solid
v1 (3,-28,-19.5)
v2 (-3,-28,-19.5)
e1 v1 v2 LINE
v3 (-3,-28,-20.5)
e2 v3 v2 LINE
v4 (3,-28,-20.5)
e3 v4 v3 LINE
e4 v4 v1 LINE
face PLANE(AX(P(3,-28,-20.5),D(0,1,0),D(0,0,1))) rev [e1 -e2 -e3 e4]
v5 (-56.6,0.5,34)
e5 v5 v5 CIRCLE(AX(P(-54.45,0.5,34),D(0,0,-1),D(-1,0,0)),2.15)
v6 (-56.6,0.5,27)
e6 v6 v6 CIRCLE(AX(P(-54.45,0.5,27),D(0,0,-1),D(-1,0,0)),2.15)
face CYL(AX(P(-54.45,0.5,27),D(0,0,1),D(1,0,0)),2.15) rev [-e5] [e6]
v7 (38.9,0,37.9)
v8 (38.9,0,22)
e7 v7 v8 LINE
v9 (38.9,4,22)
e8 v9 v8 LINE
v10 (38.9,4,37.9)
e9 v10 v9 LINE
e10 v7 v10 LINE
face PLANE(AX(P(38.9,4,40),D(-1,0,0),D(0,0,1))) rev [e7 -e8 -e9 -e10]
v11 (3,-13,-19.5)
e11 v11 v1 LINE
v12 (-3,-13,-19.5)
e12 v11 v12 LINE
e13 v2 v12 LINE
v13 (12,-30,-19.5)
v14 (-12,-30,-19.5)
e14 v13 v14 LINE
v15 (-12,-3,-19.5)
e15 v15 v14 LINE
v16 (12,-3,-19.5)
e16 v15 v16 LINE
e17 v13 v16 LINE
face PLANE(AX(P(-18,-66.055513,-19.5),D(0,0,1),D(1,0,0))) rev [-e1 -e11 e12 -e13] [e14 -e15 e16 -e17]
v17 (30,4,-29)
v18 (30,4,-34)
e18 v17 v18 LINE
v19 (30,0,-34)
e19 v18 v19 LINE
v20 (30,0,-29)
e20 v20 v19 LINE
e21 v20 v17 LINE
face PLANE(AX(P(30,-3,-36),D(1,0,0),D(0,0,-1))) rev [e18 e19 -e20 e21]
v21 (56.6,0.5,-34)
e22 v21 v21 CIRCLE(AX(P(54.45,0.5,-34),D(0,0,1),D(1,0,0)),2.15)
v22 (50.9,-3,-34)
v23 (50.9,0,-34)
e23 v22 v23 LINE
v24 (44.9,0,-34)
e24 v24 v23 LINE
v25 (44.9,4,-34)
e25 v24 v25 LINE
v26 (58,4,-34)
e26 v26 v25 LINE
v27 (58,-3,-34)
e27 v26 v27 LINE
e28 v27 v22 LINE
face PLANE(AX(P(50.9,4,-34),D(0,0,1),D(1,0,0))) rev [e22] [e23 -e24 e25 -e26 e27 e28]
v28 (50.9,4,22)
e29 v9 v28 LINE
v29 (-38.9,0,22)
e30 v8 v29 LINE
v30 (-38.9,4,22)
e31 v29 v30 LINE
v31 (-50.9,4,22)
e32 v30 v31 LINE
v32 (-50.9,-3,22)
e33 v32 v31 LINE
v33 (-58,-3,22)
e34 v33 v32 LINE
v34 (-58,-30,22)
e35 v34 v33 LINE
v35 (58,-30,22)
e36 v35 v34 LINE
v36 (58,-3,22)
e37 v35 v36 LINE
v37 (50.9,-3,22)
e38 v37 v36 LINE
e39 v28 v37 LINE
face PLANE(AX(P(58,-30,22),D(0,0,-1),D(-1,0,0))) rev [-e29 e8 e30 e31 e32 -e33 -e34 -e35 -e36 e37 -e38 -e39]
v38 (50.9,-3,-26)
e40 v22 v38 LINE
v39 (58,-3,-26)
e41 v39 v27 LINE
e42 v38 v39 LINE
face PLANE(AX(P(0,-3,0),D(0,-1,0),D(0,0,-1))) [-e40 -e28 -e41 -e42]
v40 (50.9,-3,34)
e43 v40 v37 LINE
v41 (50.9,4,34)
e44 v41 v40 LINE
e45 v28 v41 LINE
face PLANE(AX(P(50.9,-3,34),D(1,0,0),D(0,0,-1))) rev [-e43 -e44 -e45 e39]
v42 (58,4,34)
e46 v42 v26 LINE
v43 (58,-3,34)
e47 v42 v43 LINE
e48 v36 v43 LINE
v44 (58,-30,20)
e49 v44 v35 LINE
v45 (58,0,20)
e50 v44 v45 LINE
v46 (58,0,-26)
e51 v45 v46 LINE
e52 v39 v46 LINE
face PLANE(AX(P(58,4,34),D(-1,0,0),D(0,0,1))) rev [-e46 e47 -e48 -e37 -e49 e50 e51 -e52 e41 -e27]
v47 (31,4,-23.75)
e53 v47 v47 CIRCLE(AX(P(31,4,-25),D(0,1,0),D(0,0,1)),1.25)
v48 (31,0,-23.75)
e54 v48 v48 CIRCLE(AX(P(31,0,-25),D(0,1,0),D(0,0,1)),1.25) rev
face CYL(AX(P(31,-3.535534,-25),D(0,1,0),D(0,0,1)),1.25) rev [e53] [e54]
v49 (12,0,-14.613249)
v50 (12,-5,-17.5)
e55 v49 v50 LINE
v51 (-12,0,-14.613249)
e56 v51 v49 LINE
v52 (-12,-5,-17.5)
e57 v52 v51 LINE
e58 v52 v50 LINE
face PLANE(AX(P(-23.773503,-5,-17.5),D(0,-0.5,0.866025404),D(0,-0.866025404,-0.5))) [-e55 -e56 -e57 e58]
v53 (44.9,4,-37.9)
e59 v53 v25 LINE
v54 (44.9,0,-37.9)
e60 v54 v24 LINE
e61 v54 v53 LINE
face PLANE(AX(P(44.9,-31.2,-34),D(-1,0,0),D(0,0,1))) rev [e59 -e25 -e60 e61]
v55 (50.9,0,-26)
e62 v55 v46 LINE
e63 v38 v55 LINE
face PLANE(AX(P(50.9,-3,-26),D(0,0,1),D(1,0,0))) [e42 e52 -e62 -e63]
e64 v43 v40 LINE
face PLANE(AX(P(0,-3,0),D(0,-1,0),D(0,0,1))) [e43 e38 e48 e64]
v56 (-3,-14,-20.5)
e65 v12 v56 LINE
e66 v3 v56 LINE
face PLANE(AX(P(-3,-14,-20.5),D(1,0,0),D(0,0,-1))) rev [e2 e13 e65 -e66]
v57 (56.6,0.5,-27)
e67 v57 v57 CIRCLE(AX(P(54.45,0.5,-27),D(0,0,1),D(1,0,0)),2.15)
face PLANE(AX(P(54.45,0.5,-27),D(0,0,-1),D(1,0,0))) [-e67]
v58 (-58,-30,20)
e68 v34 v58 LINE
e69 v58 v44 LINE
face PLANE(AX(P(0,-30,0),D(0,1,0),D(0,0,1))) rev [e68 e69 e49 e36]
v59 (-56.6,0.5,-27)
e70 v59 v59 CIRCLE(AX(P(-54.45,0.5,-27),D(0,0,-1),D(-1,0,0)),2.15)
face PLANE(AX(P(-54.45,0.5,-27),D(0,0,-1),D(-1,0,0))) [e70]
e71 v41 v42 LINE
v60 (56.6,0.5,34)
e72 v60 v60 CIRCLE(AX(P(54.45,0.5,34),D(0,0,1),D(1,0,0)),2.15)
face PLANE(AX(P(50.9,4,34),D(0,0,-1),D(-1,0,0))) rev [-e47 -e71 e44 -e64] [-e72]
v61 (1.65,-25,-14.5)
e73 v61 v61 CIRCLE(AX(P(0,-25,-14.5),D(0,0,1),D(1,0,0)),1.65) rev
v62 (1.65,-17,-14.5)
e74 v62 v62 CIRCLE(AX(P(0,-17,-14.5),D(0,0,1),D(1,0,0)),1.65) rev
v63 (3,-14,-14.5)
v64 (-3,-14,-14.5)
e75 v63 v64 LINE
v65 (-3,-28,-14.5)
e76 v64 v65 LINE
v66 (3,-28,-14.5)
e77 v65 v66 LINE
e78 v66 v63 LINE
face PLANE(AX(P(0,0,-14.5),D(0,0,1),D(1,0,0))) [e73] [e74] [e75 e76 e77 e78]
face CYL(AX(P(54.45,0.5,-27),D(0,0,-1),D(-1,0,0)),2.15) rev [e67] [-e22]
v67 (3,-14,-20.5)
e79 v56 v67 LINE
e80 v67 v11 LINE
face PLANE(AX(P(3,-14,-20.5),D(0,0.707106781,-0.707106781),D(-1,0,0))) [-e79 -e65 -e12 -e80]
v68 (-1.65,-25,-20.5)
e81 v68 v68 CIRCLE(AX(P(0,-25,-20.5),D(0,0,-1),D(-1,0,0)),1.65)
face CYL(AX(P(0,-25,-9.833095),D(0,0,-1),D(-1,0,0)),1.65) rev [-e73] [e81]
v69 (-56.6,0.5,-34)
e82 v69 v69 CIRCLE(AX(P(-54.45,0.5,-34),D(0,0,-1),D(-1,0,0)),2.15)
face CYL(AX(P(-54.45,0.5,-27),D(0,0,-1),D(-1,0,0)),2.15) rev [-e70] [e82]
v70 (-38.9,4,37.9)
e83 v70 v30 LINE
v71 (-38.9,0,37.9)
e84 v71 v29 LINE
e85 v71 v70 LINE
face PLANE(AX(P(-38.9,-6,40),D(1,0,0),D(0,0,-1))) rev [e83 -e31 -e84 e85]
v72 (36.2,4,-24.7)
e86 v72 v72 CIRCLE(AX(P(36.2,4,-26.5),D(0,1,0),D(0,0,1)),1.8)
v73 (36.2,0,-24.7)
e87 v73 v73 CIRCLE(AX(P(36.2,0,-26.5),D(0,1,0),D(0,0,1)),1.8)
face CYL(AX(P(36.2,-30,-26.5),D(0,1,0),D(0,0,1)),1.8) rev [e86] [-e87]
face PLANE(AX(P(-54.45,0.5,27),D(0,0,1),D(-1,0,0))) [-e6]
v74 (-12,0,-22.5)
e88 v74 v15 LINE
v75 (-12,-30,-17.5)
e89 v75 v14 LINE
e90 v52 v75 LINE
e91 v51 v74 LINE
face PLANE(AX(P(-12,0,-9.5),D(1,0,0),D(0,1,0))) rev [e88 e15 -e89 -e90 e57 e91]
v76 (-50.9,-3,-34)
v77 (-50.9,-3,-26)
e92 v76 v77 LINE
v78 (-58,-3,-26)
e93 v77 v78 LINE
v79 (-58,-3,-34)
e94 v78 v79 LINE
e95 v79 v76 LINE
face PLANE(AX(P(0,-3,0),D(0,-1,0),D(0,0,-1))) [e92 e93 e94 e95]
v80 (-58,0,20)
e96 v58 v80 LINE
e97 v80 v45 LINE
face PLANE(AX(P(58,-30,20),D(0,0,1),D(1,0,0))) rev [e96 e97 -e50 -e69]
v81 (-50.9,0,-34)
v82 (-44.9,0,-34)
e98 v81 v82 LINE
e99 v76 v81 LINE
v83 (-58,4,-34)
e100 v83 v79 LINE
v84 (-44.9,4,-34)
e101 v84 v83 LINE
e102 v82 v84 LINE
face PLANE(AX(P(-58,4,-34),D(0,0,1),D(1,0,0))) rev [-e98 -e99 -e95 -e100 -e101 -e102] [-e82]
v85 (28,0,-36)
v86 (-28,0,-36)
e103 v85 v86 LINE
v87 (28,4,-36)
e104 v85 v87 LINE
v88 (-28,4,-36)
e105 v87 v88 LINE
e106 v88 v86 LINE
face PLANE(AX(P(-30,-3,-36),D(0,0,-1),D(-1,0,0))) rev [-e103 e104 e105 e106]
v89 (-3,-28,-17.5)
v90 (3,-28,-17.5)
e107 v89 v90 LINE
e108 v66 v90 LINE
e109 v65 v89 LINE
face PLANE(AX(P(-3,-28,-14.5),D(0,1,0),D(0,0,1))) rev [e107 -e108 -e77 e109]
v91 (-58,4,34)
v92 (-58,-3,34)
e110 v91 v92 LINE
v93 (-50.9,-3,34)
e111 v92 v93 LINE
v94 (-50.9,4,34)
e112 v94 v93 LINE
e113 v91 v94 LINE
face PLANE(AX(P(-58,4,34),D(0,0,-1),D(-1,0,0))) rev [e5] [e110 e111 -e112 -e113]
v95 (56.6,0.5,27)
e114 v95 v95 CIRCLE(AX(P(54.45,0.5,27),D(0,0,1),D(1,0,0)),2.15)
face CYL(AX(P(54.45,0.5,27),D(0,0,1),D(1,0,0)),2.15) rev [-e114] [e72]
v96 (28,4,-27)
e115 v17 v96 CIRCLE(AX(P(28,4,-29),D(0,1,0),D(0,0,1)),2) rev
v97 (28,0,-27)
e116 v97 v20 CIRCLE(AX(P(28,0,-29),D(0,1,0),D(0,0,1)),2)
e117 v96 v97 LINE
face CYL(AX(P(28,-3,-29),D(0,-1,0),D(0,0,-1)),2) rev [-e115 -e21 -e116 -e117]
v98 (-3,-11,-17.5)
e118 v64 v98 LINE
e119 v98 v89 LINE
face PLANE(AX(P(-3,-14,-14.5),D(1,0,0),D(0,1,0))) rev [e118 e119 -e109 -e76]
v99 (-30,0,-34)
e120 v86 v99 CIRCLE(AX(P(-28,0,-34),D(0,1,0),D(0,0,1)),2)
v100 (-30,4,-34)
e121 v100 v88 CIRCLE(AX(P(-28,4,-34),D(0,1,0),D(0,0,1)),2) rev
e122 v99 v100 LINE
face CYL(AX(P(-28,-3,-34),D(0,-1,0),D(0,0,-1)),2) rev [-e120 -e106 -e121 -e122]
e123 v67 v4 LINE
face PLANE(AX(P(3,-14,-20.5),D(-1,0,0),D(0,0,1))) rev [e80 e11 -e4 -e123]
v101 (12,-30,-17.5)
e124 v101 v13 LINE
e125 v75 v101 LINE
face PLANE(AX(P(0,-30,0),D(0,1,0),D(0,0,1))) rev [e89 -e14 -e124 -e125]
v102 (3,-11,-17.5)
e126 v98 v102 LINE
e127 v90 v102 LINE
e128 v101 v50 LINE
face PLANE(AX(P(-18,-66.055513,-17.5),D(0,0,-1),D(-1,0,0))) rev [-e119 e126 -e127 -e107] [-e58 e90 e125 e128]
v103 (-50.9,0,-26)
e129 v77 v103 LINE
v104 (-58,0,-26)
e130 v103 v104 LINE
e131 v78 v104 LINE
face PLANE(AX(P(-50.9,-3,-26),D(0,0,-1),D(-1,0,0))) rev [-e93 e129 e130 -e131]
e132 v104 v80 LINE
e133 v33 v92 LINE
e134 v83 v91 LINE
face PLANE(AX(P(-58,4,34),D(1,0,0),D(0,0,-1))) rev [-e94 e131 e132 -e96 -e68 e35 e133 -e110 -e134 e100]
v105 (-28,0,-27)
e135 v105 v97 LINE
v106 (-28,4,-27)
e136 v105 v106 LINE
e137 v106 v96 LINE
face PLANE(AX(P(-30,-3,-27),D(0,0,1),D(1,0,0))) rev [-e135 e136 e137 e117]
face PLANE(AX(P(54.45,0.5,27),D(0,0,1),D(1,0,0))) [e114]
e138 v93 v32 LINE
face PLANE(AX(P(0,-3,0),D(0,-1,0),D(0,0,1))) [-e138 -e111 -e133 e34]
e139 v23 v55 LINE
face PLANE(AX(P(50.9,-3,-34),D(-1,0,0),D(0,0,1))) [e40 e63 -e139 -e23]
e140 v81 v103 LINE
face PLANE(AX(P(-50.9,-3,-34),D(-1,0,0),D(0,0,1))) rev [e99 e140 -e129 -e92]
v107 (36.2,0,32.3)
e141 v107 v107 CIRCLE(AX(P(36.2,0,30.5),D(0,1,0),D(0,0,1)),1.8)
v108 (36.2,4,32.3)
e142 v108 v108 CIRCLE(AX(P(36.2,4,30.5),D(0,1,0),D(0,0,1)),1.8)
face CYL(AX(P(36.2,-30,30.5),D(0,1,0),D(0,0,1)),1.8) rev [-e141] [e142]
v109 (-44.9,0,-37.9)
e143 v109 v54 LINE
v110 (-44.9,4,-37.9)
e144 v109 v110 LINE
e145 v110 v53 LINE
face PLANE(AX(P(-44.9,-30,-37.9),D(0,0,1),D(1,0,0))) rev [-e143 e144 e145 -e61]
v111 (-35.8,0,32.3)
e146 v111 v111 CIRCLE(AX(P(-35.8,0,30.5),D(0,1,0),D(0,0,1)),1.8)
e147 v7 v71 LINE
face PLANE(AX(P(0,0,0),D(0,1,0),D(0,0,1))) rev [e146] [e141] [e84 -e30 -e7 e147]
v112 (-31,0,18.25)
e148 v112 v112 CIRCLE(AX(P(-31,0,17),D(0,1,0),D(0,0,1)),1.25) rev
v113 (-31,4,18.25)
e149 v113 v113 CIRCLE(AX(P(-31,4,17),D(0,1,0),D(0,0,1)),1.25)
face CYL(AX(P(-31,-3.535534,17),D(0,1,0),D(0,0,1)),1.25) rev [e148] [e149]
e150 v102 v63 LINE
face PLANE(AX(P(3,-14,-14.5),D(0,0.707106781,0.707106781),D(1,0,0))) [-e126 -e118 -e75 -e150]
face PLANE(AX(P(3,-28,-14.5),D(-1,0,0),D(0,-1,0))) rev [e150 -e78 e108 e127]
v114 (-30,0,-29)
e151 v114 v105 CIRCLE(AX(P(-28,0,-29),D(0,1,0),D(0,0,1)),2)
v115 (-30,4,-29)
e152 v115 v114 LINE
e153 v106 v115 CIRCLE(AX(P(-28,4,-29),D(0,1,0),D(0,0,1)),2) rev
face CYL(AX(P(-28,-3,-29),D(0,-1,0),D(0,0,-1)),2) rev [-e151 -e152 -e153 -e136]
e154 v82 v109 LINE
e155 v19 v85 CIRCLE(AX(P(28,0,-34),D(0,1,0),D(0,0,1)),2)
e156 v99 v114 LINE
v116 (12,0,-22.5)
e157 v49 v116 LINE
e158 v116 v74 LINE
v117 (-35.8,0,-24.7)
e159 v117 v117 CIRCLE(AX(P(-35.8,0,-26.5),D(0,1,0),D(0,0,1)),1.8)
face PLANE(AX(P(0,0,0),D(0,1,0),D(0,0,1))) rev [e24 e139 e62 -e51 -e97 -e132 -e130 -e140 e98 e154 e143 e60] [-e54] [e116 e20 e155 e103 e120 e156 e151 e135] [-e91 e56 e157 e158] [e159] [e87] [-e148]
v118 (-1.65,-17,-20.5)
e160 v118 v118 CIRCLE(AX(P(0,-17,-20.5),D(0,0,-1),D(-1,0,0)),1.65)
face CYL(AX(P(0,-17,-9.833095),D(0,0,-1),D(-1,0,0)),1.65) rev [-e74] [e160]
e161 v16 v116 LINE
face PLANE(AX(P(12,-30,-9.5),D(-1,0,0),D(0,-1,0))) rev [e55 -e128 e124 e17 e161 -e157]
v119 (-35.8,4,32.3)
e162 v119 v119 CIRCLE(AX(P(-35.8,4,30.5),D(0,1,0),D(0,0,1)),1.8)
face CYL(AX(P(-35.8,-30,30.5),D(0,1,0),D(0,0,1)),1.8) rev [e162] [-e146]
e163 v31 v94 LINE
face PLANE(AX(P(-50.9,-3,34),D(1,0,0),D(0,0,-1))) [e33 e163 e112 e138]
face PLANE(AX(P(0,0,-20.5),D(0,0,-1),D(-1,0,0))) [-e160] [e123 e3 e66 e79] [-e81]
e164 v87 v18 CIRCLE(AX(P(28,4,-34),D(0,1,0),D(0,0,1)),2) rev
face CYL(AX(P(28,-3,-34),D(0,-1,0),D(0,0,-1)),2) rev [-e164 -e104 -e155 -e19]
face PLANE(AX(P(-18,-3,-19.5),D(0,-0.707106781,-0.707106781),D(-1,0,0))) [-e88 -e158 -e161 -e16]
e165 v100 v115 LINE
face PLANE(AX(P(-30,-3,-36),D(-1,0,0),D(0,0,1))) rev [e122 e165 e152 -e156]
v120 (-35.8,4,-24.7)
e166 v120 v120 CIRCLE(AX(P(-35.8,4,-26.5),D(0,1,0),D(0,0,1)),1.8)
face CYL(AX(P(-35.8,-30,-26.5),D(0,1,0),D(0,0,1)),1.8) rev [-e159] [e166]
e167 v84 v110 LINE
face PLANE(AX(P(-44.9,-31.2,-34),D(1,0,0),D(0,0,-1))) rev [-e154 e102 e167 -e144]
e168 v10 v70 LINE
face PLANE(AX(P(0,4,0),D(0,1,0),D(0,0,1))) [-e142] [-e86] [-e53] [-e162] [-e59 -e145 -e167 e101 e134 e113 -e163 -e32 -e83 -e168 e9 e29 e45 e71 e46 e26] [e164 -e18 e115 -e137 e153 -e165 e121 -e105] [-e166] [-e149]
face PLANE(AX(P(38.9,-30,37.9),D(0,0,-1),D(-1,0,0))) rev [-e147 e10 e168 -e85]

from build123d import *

# Parameters (mm, degrees)
BOSS_EXTRUDE1_DEPTH             = 4
SKETCH3_W                       = 7.1
SKETCH3_H                       = 8
BOSS_EXTRUDE3_DEPTH             = 3
SKETCH4_R                       = 2.15
CUT_EXTRUDE1_DEPTH              = 7
MIRROR2_COPY_1_SKETCH_W         = 7.1
MIRROR2_COPY_1_SKETCH_H         = 8
MIRROR2_COPY_1_DEPTH            = 3
MIRROR2_COPY_2_SKETCH_R         = 2.15
MIRROR2_COPY_2_DEPTH            = 7
SKETCH5_W                       = 60
SKETCH5_H                       = 9
CUT_EXTRUDE2_DEPTH              = 72.37226352
FILLET1_R                       = 2
SKETCH7_W                       = 101.8
SKETCH7_H                       = 1
CUT_EXTRUDE3_DEPTH              = 72.37226352
SKETCH8_W                       = 116
SKETCH8_H                       = 2
BOSS_EXTRUDE4_DEPTH             = 30
SKETCH9_W                       = 12
SKETCH9_H                       = 18
CUT_EXTRUDE4_DEPTH              = 10
SKETCH10_W                      = 7.1
SKETCH10_H                      = 4
BOSS_EXTRUDE5_DEPTH             = 3
SKETCH12_W                      = 1.5
SKETCH12_H                      = 4
BOSS_EXTRUDE6_DEPTH             = 2
SKETCH13_W                      = 36
SKETCH13_H                      = 2
BOSS_EXTRUDE7_DEPTH             = 30
SKETCH14_W                      = 1.5
SKETCH14_H                      = 4
BOSS_EXTRUDE8_DEPTH             = 1
BOSS_EXTRUDE9_REACH             = 79.055
BOSS_EXTRUDE9_DIRECTION_2_REACH = 79.055
SKETCH16_W                      = 20
SKETCH16_H                      = 28
SKETCH16_W_2                    = 14.6
SKETCH16_H_2                    = 9.2
BOSS_EXTRUDE10_DEPTH            = 2.6
SKETCH17_W                      = 12
SKETCH17_H                      = 18
CUT_EXTRUDE5_DEPTH              = 78.054785705
SKETCH18_W                      = 6
SKETCH18_H                      = 6
CUT_EXTRUDE6_DEPTH              = 79.759380394
SKETCH22_R                      = 1.25
CUT_EXTRUDE7_DEPTH              = 4
SKETCH25_W                      = 6
SKETCH25_H                      = 30
CUT_EXTRUDE11_DEPTH             = 10
CUT_EXTRUDE12_DEPTH             = 78.810282097
CUT_EXTRUDE12_DEPTH_BACK        = 78.810282097
SKETCH26_W                      = 6.843369225
SKETCH26_H                      = 31.263319976
SKETCH26_W_2                    = 6.53419365
SKETCH26_H_2                    = 28.524331859
SKETCH27_R                      = 1.25
CUT_EXTRUDE13_DEPTH             = 79.230428862
SKETCH28_W                      = 89.8
SKETCH28_H                      = 0.6
SKETCH28_W_2                    = 77.8
CUT_EXTRUDE14_DEPTH             = 79.230428862
CHAMFER1_SIZE                   = 2
SKETCH29_W                      = 20
SKETCH29_H                      = 28
CUT_EXTRUDE15_DEPTH             = 17.4
CUT_EXTRUDE16_DEPTH             = 2
SKETCH30_W                      = 89.8
SKETCH30_H                      = 1.5
SKETCH30_W_2                    = 77.8
CUT_EXTRUDE17_DEPTH             = 78.925348892
SKETCH32_W                      = 6
SKETCH32_H                      = 14
BOSS_EXTRUDE11_DEPTH            = 1
CHAMFER2_SIZE                   = 1
SKETCH34_W                      = 6
SKETCH34_H                      = 14
BOSS_EXTRUDE12_DEPTH            = 3
CHAMFER3_SIZE                   = 3
SKETCH33_R                      = 1.65
CUT_EXTRUDE18_DEPTH             = 6
CHAMFER4_SIZE                   = 3
SKETCH35_R                      = 1.8
CUT_EXTRUDE19_DEPTH             = 78.177781777


with BuildPart() as part:
    # Sketch1 → Boss-Extrude1 (new body)
    with BuildSketch(Plane(origin=(0, 0, 0), x_dir=(1, 0, 0), z_dir=(0, 1, 0))):
        Polygon((-58, -34), (-50.9, -34), (-50.9, -41), (50.9, -41), (50.9, -34), (58, -34), (58, 34), (50.9, 34), (50.9, 41), (-50.9, 41), (-50.9, 34), (-58, 34), align=None)
    extrude(amount=BOSS_EXTRUDE1_DEPTH)

    # Sketch3 → Boss-Extrude3 (add)
    with BuildSketch(Plane.XZ):
        with Locations((-54.45, -30)):
            Rectangle(SKETCH3_W, SKETCH3_H)
    boss_extrude3 = extrude(amount=BOSS_EXTRUDE3_DEPTH)

    # Sketch4 → Cut-Extrude1 (cut)
    with BuildSketch(Plane(origin=(0, 0, -34), x_dir=(-1, 0, 0), z_dir=(0, 0, -1))):
        with Locations((54.45, 0.5)):
            Circle(SKETCH4_R)
    cut_extrude1 = extrude(amount=-CUT_EXTRUDE1_DEPTH, mode=Mode.SUBTRACT)

    # Mirror1: Boss-Extrude3, Cut-Extrude1 across plane
    add(boss_extrude3.mirror(Plane(origin=(0, 0, 0), x_dir=(0, 0, 1), z_dir=(1, 0, 0))))
    add(cut_extrude1.mirror(Plane(origin=(0, 0, 0), x_dir=(0, 0, 1), z_dir=(1, 0, 0))), mode=Mode.SUBTRACT)

    # Mirror2: Boss-Extrude3, Cut-Extrude1 across plane
    add(boss_extrude3.mirror(Plane.XY))
    add(cut_extrude1.mirror(Plane.XY), mode=Mode.SUBTRACT)

    # Mirror2 copy 1 sketch → Mirror2 copy 1 (add)
    with BuildSketch(Plane(origin=(0, 0, 0), x_dir=(-1, 0, 0), z_dir=(0, -1, 0))):
        with Locations((-54.45, -30)):
            Rectangle(MIRROR2_COPY_1_SKETCH_W, MIRROR2_COPY_1_SKETCH_H)
    extrude(amount=MIRROR2_COPY_1_DEPTH)

    # Mirror2 copy 2 sketch → Mirror2 copy 2 (cut)
    with BuildSketch(Plane.XY.offset(34)):
        with Locations((54.45, 0.5)):
            Circle(MIRROR2_COPY_2_SKETCH_R)
    extrude(amount=-MIRROR2_COPY_2_DEPTH, mode=Mode.SUBTRACT)

    # Sketch5 → Cut-Extrude2 (cut, through all)
    with BuildSketch(Plane(origin=(0, 4, 0), x_dir=(1, 0, 0), z_dir=(0, 1, 0))):
        with Locations((0, 31.5)):
            Rectangle(SKETCH5_W, SKETCH5_H)
    extrude(amount=-CUT_EXTRUDE2_DEPTH, mode=Mode.SUBTRACT)

    # Fillet1
    fillet1_edges = [part.edges().sort_by_distance(p)[0] for p in [
        (-30, 2, -27),
        (-30, 2, -36),
        (30, 2, -36),
        (30, 2, -27),
    ]]
    fillet(fillet1_edges, radius=FILLET1_R)

    # Sketch7 → Cut-Extrude3 (cut, through all)
    with BuildSketch(Plane(origin=(0, 4, 0), x_dir=(1, 0, 0), z_dir=(0, 1, 0))):
        with Locations((0, 40.5)):
            Rectangle(SKETCH7_W, SKETCH7_H)
        with Locations((0, -40.5)):
            Rectangle(SKETCH7_W, SKETCH7_H)
    extrude(amount=-CUT_EXTRUDE3_DEPTH, mode=Mode.SUBTRACT)

    # Sketch8 → Boss-Extrude4 (add)
    with BuildSketch(Plane.XZ):
        with Locations((0, 21)):
            Rectangle(SKETCH8_W, SKETCH8_H)
    extrude(amount=BOSS_EXTRUDE4_DEPTH)

    # Sketch9 → Cut-Extrude4 (cut)
    with BuildSketch(Plane(origin=(0, 4, 0), x_dir=(1, 0, 0), z_dir=(0, 1, 0))):
        with Locations((-44.9, -31)):
            Rectangle(SKETCH9_W, SKETCH9_H)
    extrude(amount=-CUT_EXTRUDE4_DEPTH, mode=Mode.SUBTRACT)

    # Sketch10 → Boss-Extrude5 (add)
    with BuildSketch(Plane.XZ.offset(3)):
        with Locations((-54.45, 24)):
            Rectangle(SKETCH10_W, SKETCH10_H)
        with Locations((54.45, 24)):
            Rectangle(SKETCH10_W, SKETCH10_H)
    extrude(amount=-BOSS_EXTRUDE5_DEPTH)

    # Sketch12 → Boss-Extrude6 (add)
    # profile 1 of 2: a face of its own
    with BuildSketch(Plane.ZY.offset(51)):
        Polygon((22, -5.8), (22, -16.2), (24.7, -13.5), (24.7, -8.5), align=None)
        with Locations((23.35, -11)):
            Rectangle(SKETCH12_W, SKETCH12_H, mode=Mode.SUBTRACT)
    # profile 2 of 2: a face of its own
    with BuildSketch(Plane.ZY.offset(51)):
        Polygon((22, -20.8), (22, -31.2), (24.7, -28.5), (24.7, -23.5), align=None)
        with Locations((23.35, -26)):
            Rectangle(SKETCH12_W, SKETCH12_H, mode=Mode.SUBTRACT)
    boss_extrude6 = extrude(amount=-BOSS_EXTRUDE6_DEPTH)

    # Mirror3: Boss-Extrude6 across plane
    add(boss_extrude6.mirror(Plane(origin=(-44.9, 0, 0), x_dir=(0, 0, 1), z_dir=(1, 0, 0))))

    # Sketch13 → Boss-Extrude7 (add)
    with BuildSketch(Plane.XZ):
        with Locations((0, -18.5)):
            Rectangle(SKETCH13_W, SKETCH13_H)
    extrude(amount=BOSS_EXTRUDE7_DEPTH)

    # Boss-Extrude9: up to this face of the body (flat: up to its plane)
    boss_extrude9_end = Plane(part.part.faces().sort_by_distance((-18, -15, -18.5))[0])
    # Sketch15 → Boss-Extrude9 (add, up to the picked face)
    with BuildSketch(Plane(origin=(0, 0, 0), x_dir=(0, 0, -1), z_dir=(1, 0, 0)), mode=Mode.PRIVATE) as boss_extrude9_sk1:
        Polygon((17.5, 0), (17.5, -5), (14.613248654, 0), align=None)
    boss_extrude9_tool1 = split(extrude(boss_extrude9_sk1.sketch, amount=-BOSS_EXTRUDE9_REACH, mode=Mode.PRIVATE), bisect_by=boss_extrude9_end, keep=Keep.BOTH, mode=Mode.PRIVATE)
    add(boss_extrude9_tool1.solids().sort_by(Axis((0, -1.666667, -16.53775), (-1, 0, 0)))[0])

    # Boss-Extrude9 direction 2: up to this face of the body (flat: up to its plane)
    boss_extrude9_direction_2_end = Plane(part.part.faces().sort_by_distance((18, -15, -18.5))[0])
    # Sketch15 → Boss-Extrude9 direction 2 (add, up to the picked face)
    with BuildSketch(Plane(origin=(0, 0, 0), x_dir=(0, 0, -1), z_dir=(1, 0, 0)), mode=Mode.PRIVATE) as boss_extrude9_direction_2_sk1:
        Polygon((17.5, 0), (17.5, -5), (14.613248654, 0), align=None)
    boss_extrude9_direction_2_tool1 = split(extrude(boss_extrude9_direction_2_sk1.sketch, amount=BOSS_EXTRUDE9_DIRECTION_2_REACH, mode=Mode.PRIVATE), bisect_by=boss_extrude9_direction_2_end, keep=Keep.BOTH, mode=Mode.PRIVATE)
    add(boss_extrude9_direction_2_tool1.solids().sort_by(Axis((0, -1.666667, -16.53775), (1, 0, 0)))[0])

    # Sketch16 → Boss-Extrude10 (add)
    with BuildSketch(Plane.XY.offset(40)):
        with Locations((28, -14)):
            Rectangle(SKETCH16_W, SKETCH16_H)
        with Locations((28, -20.4)):
            Rectangle(SKETCH16_W_2, SKETCH16_H_2, mode=Mode.SUBTRACT)
    extrude(amount=-BOSS_EXTRUDE10_DEPTH)

    # Sketch17 → Cut-Extrude5 (cut, through all)
    with BuildSketch(Plane.XZ):
        with Locations((44.9, 31)):
            Rectangle(SKETCH17_W, SKETCH17_H)
    extrude(amount=-CUT_EXTRUDE5_DEPTH, mode=Mode.SUBTRACT)

    # Sketch18 → Cut-Extrude6 (cut, through all)
    with BuildSketch(Plane(origin=(0, 4, 0), x_dir=(1, 0, 0), z_dir=(0, 1, 0))):
        with Locations((47.9, 37)):
            Rectangle(SKETCH18_W, SKETCH18_H)
        with Locations((-47.9, 37)):
            Rectangle(SKETCH18_W, SKETCH18_H)
    extrude(amount=-CUT_EXTRUDE6_DEPTH, mode=Mode.SUBTRACT)

    # Sketch22 → Cut-Extrude7 (cut)
    with BuildSketch(Plane(origin=(0, 4, 0), x_dir=(1, 0, 0), z_dir=(0, 1, 0))):
        with Locations(Location((31, 25, 0), (0, 0, 270))):
            Circle(SKETCH22_R)
        with Locations(Location((-31, -17, 0), (0, 0, 270))):
            Circle(SKETCH22_R)
    extrude(amount=-CUT_EXTRUDE7_DEPTH, mode=Mode.SUBTRACT)

    # Sketch25 → Cut-Extrude11 (cut)
    with BuildSketch(Plane(origin=(0, 0, -19.5), x_dir=(-1, 0, 0), z_dir=(0, 0, -1))):
        with Locations((-15, -15)):
            Rectangle(SKETCH25_W, SKETCH25_H)
        with Locations((15, -15)):
            Rectangle(SKETCH25_W, SKETCH25_H)
    extrude(amount=-CUT_EXTRUDE11_DEPTH, mode=Mode.SUBTRACT)

    # Sketch26 → Cut-Extrude12 (cut, two sides: drawn at the far end of the back side and taken through both)
    with BuildSketch(Plane.ZY.offset(1).offset(-CUT_EXTRUDE12_DEPTH_BACK)):
        with Locations((-23.779868126, -20.73082856)):
            Rectangle(SKETCH26_W, SKETCH26_H)
        with Locations((25.267096825, -20.06216593)):
            Rectangle(SKETCH26_W_2, SKETCH26_H_2)
    extrude(amount=CUT_EXTRUDE12_DEPTH + CUT_EXTRUDE12_DEPTH_BACK, mode=Mode.SUBTRACT)

    # Sketch27 → Cut-Extrude13 (cut, through all)
    with BuildSketch(Plane(origin=(0, 4, 0), x_dir=(1, 0, 0), z_dir=(0, 1, 0))):
        with Locations(Location((-35.8, 26.5, 0), (0, 0, 270))):
            Circle(SKETCH27_R)
        with Locations(Location((-35.8, -30.5, 0), (0, 0, 270))):
            Circle(SKETCH27_R)
        with Locations(Location((36.2, -30.5, 0), (0, 0, 270))):
            Circle(SKETCH27_R)
        with Locations(Location((36.2, 26.5, 0), (0, 0, 270))):
            Circle(SKETCH27_R)
    extrude(amount=-CUT_EXTRUDE13_DEPTH, mode=Mode.SUBTRACT)

    # Sketch28 → Cut-Extrude14 (cut, through all)
    with BuildSketch(Plane(origin=(0, 4, 0), x_dir=(1, 0, 0), z_dir=(0, 1, 0))):
        with Locations((0, 39.7)):
            Rectangle(SKETCH28_W, SKETCH28_H)
        with Locations((0, -39.7)):
            Rectangle(SKETCH28_W_2, SKETCH28_H)
    extrude(amount=-CUT_EXTRUDE14_DEPTH, mode=Mode.SUBTRACT)

    # Chamfer1
    chamfer1_edges = [part.edges().sort_by_distance(p)[0] for p in [
        (28, 0, 37.4),
    ]]
    chamfer(chamfer1_edges, length=CHAMFER1_SIZE)

    # Sketch29 → Cut-Extrude15 (cut)
    with BuildSketch(Plane.XY.offset(39.4)):
        with Locations((28, -14)):
            Rectangle(SKETCH29_W, SKETCH29_H)
    extrude(amount=-CUT_EXTRUDE15_DEPTH, mode=Mode.SUBTRACT)

    # Sketch30 → Cut-Extrude17 (cut, through all)
    with BuildSketch(Plane(origin=(0, 4, 0), x_dir=(1, 0, 0), z_dir=(0, 1, 0))):
        with Locations((0, 38.65)):
            Rectangle(SKETCH30_W, SKETCH30_H)
        with Locations((0, -38.65)):
            Rectangle(SKETCH30_W_2, SKETCH30_H)
    extrude(amount=-CUT_EXTRUDE17_DEPTH, mode=Mode.SUBTRACT)

    # Sketch32 → Boss-Extrude11 (add)
    with BuildSketch(Plane(origin=(0, 0, -19.5), x_dir=(-1, 0, 0), z_dir=(0, 0, -1))):
        with Locations((0, -21)):
            Rectangle(SKETCH32_W, SKETCH32_H)
    extrude(amount=BOSS_EXTRUDE11_DEPTH)

    # Chamfer2
    chamfer2_edges = [part.edges().sort_by_distance(p)[0] for p in [
        (0, -14, -19.5),
    ]]
    chamfer(chamfer2_edges, length=CHAMFER2_SIZE - 0.0001)  # a hair under: the kernel refuses the full size

    # Sketch34 → Boss-Extrude12 (add)
    with BuildSketch(Plane.XY.offset(-17.5)):
        with Locations((0, -21)):
            Rectangle(SKETCH34_W, SKETCH34_H)
    extrude(amount=BOSS_EXTRUDE12_DEPTH)

    # Chamfer3
    chamfer3_edges = [part.edges().sort_by_distance(p)[0] for p in [
        (0, -14, -17.5),
    ]]
    chamfer(chamfer3_edges, length=CHAMFER3_SIZE - 0.0001)  # a hair under: the kernel refuses the full size

    # Sketch33 → Cut-Extrude18 (cut)
    with BuildSketch(Plane(origin=(0, 0, -20.5), x_dir=(-1, 0, 0), z_dir=(0, 0, -1))):
        with Locations((0, -17)):
            Circle(SKETCH33_R)
        with Locations((0, -25)):
            Circle(SKETCH33_R)
    extrude(amount=-CUT_EXTRUDE18_DEPTH, mode=Mode.SUBTRACT)

    # Chamfer4
    chamfer4_edges = [part.edges().sort_by_distance(p)[0] for p in [
        (0, 0, -19.5),
    ]]
    chamfer(chamfer4_edges, length=CHAMFER4_SIZE)

    # Sketch35 → Cut-Extrude19 (cut, through all)
    with BuildSketch(Plane(origin=(0, 4, 0), x_dir=(1, 0, 0), z_dir=(0, 1, 0))):
        with Locations(Location((-35.8, 26.5, 0), (0, 0, 270))):
            Circle(SKETCH35_R)
        with Locations(Location((36.2, 26.5, 0), (0, 0, 270))):
            Circle(SKETCH35_R)
        with Locations(Location((36.2, -30.5, 0), (0, 0, 270))):
            Circle(SKETCH35_R)
        with Locations(Location((-35.8, -30.5, 0), (0, 0, 270))):
            Circle(SKETCH35_R)
    extrude(amount=-CUT_EXTRUDE19_DEPTH, mode=Mode.SUBTRACT)


with BuildPart() as body_2:
    # Sketch14 → Boss-Extrude8 (new, symmetric)
    with BuildSketch(Plane(origin=(0, 0, 0), x_dir=(0, 0, -1), z_dir=(1, 0, 0))):
        Polygon((24.2, -8.5), (21.5, -5.8), (21.5, -16.2), (24.2, -13.5), align=None)
        with Locations((22.85, -11)):
            Rectangle(SKETCH14_W, SKETCH14_H, mode=Mode.SUBTRACT)
    extrude(amount=BOSS_EXTRUDE8_DEPTH, both=True)

    # Sketch31 → Cut-Extrude16 (cut)
    with BuildSketch(Plane.ZY.offset(1)):
        Polygon((-24.2, -8.5), (-24.2, -13.5), (-21.5, -16.2), (-21.5, -5.8), align=None)
    extrude(amount=-CUT_EXTRUDE16_DEPTH, mode=Mode.SUBTRACT)


solid = part.part
